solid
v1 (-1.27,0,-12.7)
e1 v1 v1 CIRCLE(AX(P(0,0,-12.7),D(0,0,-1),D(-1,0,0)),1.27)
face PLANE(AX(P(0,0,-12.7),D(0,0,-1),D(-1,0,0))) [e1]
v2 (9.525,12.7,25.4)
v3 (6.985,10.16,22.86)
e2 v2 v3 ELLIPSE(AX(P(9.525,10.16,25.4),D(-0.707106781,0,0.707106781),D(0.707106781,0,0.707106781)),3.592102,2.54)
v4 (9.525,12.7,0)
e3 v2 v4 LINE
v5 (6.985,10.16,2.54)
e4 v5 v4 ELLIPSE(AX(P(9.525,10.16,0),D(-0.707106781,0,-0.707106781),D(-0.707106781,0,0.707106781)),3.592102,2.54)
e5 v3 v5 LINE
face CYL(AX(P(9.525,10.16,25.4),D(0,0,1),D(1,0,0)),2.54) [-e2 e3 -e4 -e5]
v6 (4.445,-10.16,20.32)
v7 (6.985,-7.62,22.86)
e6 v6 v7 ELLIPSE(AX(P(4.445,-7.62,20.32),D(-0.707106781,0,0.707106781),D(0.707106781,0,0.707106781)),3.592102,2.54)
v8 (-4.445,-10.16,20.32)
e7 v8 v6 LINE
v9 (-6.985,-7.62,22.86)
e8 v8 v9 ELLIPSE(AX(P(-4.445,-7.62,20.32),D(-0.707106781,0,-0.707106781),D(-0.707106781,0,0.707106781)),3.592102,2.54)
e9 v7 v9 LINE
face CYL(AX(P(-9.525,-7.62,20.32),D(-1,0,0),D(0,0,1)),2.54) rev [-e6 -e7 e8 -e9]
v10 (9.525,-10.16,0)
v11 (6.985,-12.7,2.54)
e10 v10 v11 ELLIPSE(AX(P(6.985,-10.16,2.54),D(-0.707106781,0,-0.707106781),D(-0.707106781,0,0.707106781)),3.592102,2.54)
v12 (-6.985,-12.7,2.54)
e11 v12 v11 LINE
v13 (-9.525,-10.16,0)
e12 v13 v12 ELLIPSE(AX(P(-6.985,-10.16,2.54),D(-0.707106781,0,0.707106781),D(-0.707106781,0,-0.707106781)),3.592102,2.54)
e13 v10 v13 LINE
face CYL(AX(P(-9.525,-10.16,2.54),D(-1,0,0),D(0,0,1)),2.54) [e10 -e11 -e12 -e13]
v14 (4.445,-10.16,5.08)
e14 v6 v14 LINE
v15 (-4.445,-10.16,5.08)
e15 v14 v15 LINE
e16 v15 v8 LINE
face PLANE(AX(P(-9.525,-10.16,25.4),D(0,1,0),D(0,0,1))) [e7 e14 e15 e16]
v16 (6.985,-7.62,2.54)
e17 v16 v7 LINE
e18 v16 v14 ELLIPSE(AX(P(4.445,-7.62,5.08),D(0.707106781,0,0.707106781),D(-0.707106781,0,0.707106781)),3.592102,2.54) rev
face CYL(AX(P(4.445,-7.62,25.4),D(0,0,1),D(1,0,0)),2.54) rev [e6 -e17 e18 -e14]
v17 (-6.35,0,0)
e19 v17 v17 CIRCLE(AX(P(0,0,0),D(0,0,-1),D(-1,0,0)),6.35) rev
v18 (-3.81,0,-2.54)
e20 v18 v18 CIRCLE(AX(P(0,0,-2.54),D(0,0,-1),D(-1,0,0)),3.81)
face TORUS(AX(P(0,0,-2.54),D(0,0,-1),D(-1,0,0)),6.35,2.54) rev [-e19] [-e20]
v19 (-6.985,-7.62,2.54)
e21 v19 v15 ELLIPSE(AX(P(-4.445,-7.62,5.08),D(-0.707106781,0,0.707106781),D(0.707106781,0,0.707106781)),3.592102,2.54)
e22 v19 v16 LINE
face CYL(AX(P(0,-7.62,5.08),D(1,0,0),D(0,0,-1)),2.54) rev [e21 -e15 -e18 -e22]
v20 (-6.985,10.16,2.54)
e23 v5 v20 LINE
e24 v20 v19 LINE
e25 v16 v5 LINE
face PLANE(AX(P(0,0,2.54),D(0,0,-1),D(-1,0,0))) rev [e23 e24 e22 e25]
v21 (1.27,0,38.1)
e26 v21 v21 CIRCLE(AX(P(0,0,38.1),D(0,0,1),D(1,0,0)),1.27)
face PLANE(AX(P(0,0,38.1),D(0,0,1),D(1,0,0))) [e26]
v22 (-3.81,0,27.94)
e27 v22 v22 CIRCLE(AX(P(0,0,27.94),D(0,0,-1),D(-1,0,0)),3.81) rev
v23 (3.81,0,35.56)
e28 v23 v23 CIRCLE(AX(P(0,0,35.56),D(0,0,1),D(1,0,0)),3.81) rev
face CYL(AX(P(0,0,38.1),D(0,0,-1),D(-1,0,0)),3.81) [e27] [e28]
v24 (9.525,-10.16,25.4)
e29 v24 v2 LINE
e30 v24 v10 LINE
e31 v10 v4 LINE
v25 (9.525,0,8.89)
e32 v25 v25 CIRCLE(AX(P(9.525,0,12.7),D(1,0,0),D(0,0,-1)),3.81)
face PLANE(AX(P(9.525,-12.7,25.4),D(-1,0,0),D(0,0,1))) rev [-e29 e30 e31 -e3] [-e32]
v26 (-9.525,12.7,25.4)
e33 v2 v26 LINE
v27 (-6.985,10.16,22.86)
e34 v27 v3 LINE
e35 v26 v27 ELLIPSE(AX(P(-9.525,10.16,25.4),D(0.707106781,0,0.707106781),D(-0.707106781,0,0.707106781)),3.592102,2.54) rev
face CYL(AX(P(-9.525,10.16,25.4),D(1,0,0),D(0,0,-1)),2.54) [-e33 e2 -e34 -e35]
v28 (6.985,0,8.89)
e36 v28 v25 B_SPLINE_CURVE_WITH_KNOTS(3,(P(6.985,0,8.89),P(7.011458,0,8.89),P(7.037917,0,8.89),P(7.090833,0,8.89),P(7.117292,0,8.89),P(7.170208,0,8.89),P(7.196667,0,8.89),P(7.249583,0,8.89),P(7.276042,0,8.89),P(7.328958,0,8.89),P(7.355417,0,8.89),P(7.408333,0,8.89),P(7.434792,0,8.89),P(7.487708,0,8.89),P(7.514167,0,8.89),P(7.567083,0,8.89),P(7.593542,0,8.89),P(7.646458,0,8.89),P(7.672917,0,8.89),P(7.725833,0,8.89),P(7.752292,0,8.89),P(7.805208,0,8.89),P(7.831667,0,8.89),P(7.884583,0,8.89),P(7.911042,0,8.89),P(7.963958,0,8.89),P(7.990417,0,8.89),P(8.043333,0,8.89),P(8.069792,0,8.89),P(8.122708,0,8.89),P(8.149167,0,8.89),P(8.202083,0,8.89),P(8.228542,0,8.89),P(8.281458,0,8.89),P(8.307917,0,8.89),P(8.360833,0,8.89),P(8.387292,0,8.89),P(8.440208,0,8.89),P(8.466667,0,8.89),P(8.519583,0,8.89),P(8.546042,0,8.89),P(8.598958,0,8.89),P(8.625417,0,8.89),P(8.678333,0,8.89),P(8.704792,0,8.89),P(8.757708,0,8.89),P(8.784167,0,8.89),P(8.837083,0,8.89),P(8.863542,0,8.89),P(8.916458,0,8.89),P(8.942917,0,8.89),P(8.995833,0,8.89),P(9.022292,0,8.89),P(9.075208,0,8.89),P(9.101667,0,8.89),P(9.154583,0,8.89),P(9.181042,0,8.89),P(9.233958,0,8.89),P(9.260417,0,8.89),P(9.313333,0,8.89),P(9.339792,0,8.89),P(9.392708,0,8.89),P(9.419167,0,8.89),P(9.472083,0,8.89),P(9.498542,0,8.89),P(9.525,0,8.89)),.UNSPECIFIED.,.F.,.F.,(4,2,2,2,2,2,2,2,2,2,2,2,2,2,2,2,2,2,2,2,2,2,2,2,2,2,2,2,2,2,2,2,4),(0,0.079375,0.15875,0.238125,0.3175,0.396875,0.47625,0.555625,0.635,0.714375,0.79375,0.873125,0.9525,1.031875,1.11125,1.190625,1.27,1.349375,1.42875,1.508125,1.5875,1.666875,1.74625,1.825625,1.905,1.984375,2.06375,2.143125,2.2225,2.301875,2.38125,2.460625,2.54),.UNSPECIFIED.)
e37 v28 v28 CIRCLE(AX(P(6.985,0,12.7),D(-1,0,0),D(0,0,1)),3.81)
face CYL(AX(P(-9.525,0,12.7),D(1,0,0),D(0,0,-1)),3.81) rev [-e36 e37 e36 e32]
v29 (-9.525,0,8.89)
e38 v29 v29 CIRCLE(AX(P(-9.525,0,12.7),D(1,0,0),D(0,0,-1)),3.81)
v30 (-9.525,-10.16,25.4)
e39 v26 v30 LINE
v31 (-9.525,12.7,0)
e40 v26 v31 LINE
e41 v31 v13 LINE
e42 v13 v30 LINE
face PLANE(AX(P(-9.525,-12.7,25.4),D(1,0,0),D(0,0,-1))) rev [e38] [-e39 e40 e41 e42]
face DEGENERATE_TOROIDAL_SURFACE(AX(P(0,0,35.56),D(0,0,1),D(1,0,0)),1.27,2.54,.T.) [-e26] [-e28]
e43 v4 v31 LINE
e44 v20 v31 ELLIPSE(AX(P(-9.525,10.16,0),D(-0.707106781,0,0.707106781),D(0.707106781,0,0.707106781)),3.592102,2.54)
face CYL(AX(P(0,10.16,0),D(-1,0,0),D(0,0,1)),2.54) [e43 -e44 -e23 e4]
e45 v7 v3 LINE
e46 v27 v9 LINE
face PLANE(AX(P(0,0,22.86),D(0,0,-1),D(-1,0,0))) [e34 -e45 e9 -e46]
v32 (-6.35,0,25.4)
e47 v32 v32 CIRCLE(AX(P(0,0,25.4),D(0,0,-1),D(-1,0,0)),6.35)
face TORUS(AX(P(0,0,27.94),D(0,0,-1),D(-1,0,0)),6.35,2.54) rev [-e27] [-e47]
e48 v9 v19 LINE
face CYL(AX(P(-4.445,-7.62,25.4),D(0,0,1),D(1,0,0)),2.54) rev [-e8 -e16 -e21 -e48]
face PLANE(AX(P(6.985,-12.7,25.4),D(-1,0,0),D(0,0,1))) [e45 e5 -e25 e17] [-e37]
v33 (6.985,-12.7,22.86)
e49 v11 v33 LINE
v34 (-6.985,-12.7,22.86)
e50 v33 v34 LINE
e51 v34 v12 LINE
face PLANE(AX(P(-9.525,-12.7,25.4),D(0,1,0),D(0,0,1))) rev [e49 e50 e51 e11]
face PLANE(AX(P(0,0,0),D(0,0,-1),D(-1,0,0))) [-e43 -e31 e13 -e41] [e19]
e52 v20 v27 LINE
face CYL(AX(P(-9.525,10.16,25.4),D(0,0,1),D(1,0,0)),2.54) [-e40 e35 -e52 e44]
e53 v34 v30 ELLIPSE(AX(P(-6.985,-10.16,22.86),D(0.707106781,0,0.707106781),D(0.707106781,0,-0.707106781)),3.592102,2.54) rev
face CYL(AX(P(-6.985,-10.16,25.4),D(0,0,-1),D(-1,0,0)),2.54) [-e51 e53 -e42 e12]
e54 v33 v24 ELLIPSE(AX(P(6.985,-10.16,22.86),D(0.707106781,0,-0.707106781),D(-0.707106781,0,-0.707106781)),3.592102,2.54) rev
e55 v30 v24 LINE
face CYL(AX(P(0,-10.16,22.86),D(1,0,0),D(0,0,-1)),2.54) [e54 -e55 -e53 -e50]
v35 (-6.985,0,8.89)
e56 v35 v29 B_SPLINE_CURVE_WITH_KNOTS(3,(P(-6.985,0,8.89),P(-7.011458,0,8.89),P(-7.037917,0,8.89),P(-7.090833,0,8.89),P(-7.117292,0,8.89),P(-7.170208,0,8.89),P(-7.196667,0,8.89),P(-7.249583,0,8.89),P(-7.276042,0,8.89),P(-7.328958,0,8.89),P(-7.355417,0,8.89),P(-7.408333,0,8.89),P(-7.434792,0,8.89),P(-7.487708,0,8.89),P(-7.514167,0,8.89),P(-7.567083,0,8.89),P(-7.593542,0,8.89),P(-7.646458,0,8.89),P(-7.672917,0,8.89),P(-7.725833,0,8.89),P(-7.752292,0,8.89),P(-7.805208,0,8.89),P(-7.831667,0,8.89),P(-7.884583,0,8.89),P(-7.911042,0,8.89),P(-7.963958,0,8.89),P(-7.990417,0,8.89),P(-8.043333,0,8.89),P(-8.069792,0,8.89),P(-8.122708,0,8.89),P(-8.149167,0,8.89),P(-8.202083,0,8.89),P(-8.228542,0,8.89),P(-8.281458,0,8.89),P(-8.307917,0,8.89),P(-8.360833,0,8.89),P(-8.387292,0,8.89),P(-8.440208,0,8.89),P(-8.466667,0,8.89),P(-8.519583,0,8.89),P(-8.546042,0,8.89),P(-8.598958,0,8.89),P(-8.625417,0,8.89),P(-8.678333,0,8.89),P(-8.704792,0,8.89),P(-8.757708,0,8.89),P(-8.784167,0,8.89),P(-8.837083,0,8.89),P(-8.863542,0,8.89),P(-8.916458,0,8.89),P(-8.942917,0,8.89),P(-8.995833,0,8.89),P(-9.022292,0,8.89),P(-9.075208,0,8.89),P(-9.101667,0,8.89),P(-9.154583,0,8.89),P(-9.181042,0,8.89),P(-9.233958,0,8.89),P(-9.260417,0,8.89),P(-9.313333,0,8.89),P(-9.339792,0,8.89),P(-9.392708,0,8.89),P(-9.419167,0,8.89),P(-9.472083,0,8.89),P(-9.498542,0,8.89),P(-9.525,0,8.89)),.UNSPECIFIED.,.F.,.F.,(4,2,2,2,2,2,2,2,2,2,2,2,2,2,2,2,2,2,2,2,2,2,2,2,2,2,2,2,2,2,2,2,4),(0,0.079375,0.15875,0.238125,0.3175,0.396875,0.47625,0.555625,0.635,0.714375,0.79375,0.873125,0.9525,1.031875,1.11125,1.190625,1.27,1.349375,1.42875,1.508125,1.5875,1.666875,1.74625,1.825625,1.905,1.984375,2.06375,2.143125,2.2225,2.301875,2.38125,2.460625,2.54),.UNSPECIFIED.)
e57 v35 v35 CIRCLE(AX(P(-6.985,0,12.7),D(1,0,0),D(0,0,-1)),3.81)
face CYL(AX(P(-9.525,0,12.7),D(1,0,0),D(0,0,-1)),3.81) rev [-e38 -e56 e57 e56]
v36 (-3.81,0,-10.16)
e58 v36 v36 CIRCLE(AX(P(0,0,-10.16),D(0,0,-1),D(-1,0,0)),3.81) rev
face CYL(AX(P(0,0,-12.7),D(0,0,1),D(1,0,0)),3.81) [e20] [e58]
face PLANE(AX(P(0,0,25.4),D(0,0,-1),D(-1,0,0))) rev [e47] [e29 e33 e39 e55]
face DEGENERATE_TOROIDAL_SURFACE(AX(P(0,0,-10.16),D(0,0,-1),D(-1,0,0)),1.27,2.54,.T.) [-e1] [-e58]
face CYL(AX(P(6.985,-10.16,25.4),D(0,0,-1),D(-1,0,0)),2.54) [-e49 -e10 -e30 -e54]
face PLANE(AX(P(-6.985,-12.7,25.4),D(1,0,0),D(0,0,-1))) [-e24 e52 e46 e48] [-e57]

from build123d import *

# Parameters (mm, degrees)
SKETCH1_W          = 19.05
SKETCH1_H          = 25.4
MAIN_BODY_DEPTH    = 25.4
HOLLOW_IT_T        = -2.54
SKETCH3_R          = 3.81
NIBBLE_NO_1_DEPTH  = 12.7
NIBBLE_START       = 12.7
SKETCH4_R          = 3.81
NIBBLE_NO_2_DEPTH  = 12.7
SKETCH5_W          = 1.27
SKETCH5_H          = 3.81
FLAG_DEPTH         = 0.254
SKETCH2_R          = 3.81
NIBBLE_HOLES_DEPTH = 45.45
SMOOTHNESS_R       = 2.54


with BuildPart() as part:
    # Sketch1 → main body (new body)
    with BuildSketch(Plane.XY):
        Rectangle(SKETCH1_W, SKETCH1_H)
    extrude(amount=MAIN_BODY_DEPTH)

    # hollow it
    hollow_it_openings = [part.faces().sort_by_distance(p)[0] for p in [
        (0, 12.7, 12.7),
    ]]
    offset(amount=HOLLOW_IT_T, openings=hollow_it_openings, kind=Kind.INTERSECTION)

    # Sketch3 → nibble no 1 (add)
    with BuildSketch(Plane.XY.offset(25.4)):
        with Locations(Location((0, 0, 0), (0, 0, 180))):
            Circle(SKETCH3_R)
    extrude(amount=NIBBLE_NO_1_DEPTH)

    # Sketch4 → nibble no 2 (add)
    with BuildSketch(Plane(origin=(0, 0, 0), x_dir=(-1, 0, 0), z_dir=(0, 0, -1)).offset(NIBBLE_START)):
        Circle(SKETCH4_R)
    extrude(amount=-NIBBLE_NO_2_DEPTH)

    # Sketch5 → flag (add)
    with BuildSketch(Plane(origin=(0, 0, 0), x_dir=(-1, 0, 0), z_dir=(0, -1, 0))):
        with Locations((-0.18666561, 6.353298227)):
            Rectangle(SKETCH5_W, SKETCH5_H)
    extrude(amount=FLAG_DEPTH)

    # Sketch2 → nibble holes (cut, through all)
    with BuildSketch(Plane(origin=(9.525, 0, 0), x_dir=(0, 0, -1), z_dir=(1, 0, 0))):
        with Locations((-12.7, 0)):
            Circle(SKETCH2_R)
    extrude(amount=-NIBBLE_HOLES_DEPTH, mode=Mode.SUBTRACT)

    # smoothness
    smoothness_edges = [part.edges().sort_by_distance(p)[0] for p in [
        (0, -12.7, 25.4),
        (6.985, -10.16, 12.7),
        (0, 12.7, 2.54),
        (6.985, 12.7, 12.7),
        (-6.985, 12.7, 12.7),
        (0, -10.16, 2.54),
        (-6.985, -10.16, 12.7),
        (0, 12.7, 22.86),
        (0, -10.16, 22.86),
        (3.81, 0, 25.4),
        (3.81, 0, 38.1),
        (3.81, 0, 0),
        (3.81, 0, -12.7),
        (0, -12.7, 0),
        (9.525, -12.7, 12.7),
        (-9.525, -12.7, 12.7),
    ]]
    fillet(smoothness_edges, radius=SMOOTHNESS_R - 0.0001)  # a hair under: the kernel refuses the full size


solid = part.part
